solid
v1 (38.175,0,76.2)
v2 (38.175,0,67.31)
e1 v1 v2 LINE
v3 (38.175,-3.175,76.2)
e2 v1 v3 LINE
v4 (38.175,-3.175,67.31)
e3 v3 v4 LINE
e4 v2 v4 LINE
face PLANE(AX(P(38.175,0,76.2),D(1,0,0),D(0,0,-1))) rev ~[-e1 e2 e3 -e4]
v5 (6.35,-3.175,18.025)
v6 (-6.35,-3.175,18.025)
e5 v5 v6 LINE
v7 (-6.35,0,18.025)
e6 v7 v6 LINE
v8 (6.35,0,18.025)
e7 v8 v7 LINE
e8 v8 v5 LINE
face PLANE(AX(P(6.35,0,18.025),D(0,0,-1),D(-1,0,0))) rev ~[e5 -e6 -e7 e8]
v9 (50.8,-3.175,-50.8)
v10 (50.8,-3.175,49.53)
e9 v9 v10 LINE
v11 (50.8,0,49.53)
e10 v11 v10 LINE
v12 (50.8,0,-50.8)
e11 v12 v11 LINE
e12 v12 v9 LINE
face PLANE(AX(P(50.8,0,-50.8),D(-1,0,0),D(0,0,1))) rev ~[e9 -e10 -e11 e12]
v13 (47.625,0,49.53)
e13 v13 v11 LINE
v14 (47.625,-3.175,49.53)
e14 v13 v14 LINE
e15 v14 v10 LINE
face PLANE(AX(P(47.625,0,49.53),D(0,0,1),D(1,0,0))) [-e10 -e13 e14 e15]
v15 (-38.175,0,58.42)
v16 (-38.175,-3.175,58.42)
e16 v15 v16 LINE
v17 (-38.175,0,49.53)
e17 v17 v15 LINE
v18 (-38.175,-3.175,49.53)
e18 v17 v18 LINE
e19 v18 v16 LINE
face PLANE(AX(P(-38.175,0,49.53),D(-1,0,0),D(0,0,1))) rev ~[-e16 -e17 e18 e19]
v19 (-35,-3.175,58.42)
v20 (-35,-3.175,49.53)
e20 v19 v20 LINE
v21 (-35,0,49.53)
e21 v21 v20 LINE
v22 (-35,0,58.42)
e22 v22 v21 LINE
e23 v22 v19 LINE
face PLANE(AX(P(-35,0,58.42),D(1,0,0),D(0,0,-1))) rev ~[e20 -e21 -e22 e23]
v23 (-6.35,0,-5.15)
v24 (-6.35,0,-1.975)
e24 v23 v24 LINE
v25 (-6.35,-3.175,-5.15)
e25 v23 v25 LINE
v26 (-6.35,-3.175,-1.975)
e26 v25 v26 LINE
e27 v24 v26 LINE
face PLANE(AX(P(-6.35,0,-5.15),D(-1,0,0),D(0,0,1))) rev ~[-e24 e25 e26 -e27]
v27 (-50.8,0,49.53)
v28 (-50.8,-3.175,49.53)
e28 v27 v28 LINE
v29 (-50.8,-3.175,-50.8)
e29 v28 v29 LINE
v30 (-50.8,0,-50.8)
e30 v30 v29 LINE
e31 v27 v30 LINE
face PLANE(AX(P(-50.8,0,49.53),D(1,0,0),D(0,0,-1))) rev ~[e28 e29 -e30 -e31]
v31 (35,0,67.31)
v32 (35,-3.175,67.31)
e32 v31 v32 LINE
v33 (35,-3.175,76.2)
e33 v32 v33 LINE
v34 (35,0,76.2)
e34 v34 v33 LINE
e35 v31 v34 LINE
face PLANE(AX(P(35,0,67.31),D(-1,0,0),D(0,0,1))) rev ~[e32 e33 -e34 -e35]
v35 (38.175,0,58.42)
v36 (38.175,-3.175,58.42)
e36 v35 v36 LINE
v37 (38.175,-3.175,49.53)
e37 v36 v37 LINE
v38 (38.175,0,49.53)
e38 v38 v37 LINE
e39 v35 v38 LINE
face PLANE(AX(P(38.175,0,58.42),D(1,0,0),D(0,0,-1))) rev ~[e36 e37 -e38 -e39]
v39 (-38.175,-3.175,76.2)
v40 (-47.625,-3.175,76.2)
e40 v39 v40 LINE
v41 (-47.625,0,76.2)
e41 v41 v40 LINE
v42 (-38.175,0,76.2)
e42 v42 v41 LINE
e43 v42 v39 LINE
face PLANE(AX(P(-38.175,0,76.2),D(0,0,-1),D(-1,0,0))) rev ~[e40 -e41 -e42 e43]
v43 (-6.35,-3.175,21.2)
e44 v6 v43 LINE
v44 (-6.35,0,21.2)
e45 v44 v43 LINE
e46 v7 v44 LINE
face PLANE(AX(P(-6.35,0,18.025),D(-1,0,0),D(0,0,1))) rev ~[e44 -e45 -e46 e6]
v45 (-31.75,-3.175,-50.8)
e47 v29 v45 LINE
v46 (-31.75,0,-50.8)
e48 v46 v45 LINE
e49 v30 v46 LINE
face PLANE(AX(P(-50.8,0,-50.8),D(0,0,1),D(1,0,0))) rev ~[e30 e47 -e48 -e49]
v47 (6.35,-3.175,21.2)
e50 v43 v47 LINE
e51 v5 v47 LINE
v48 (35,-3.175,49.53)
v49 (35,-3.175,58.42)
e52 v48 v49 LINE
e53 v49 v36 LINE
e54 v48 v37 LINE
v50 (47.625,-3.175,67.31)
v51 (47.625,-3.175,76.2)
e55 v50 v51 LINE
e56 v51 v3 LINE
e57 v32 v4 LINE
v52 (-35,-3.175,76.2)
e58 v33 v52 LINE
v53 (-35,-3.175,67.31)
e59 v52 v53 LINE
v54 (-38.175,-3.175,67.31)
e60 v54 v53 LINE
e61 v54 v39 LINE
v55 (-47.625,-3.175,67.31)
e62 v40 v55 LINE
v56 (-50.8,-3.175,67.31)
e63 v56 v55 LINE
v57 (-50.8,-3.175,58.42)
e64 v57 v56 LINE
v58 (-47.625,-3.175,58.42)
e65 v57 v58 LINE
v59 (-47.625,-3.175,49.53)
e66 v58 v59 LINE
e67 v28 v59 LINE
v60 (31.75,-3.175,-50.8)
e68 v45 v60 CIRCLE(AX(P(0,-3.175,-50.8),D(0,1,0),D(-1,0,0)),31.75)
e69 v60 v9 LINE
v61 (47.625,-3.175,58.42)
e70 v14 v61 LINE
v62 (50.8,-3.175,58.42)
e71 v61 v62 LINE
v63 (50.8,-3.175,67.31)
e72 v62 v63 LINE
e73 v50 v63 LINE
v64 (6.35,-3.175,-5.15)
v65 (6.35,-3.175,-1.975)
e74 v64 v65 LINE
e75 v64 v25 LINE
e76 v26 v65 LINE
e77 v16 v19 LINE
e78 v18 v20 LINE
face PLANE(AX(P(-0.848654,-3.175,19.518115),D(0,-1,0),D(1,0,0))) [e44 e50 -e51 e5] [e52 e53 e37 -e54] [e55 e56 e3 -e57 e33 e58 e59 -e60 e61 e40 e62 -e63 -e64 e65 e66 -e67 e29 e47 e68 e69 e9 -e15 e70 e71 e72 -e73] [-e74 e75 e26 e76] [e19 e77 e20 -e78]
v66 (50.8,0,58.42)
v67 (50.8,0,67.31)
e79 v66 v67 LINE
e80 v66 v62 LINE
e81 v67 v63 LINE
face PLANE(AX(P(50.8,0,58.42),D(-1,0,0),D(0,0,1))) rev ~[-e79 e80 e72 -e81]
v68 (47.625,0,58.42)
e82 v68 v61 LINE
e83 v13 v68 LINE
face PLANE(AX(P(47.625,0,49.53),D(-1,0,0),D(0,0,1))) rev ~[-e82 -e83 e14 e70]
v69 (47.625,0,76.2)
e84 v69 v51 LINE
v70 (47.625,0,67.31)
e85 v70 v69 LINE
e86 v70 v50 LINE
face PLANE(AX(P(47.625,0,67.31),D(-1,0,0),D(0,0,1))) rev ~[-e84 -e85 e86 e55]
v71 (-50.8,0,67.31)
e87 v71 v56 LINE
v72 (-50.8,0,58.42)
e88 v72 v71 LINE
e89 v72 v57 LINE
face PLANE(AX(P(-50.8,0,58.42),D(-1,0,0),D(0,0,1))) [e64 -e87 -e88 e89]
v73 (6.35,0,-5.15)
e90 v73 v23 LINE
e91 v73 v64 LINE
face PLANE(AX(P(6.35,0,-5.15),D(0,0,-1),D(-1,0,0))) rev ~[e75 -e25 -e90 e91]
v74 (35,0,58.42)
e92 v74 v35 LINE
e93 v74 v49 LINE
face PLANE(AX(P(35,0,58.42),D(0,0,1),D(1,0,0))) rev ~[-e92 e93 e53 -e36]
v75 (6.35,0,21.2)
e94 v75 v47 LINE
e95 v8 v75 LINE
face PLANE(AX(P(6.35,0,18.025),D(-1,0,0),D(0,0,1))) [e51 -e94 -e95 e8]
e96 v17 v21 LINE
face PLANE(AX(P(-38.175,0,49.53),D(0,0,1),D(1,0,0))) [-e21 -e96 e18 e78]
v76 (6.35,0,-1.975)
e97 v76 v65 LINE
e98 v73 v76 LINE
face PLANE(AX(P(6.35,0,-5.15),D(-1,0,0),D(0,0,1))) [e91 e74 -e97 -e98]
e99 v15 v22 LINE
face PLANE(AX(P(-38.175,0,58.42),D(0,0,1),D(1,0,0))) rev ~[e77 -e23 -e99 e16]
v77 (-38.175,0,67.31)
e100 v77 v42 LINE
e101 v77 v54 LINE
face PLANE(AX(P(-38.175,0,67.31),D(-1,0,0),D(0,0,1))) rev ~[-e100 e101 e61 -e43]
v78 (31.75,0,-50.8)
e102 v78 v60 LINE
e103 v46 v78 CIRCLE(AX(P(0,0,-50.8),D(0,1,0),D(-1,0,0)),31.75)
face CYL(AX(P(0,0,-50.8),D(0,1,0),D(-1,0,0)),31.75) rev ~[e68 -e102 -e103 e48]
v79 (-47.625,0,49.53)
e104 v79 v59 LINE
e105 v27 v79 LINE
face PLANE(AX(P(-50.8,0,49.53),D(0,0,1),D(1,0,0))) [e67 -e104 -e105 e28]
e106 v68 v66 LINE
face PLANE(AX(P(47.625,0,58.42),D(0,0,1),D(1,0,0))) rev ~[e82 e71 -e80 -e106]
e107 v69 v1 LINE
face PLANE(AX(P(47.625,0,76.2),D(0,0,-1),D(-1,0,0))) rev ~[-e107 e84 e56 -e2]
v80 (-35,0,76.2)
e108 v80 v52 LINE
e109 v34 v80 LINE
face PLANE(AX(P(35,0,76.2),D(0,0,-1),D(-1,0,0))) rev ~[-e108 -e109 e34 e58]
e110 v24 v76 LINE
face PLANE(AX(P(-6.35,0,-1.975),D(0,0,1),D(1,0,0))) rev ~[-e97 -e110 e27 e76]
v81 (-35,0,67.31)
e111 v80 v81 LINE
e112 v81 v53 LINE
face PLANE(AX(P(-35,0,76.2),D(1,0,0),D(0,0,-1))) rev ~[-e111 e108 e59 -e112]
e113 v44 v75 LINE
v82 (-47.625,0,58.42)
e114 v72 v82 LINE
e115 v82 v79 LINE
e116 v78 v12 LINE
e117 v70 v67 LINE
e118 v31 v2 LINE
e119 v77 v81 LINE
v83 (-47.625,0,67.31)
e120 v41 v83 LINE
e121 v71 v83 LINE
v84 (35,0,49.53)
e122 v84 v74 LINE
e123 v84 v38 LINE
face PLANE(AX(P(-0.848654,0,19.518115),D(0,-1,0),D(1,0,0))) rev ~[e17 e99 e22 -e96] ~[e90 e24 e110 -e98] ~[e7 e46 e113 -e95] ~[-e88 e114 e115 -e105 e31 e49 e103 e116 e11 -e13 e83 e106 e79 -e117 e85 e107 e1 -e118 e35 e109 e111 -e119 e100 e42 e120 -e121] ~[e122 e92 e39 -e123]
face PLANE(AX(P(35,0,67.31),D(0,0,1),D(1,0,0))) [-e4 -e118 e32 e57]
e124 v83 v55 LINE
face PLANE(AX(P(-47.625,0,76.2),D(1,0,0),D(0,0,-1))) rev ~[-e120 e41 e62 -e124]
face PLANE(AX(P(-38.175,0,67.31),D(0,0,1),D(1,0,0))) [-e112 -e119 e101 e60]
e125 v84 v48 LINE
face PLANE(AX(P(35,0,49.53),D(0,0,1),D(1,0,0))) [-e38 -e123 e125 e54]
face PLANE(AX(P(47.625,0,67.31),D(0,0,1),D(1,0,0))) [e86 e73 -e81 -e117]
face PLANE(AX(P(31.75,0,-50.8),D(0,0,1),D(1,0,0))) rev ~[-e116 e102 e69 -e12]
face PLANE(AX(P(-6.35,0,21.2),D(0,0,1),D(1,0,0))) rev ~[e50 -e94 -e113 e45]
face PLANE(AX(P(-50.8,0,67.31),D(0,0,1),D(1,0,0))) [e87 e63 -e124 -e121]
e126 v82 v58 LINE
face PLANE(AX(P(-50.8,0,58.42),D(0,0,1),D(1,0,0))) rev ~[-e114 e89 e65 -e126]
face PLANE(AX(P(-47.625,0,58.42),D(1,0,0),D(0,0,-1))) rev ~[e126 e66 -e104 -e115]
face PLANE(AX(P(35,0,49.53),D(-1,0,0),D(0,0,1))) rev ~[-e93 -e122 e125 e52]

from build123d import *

# Parameters (mm, degrees)
F0_W     = 3.175
F0_H     = 8.89
F0_H_2   = 12.7
F0_H_3   = 49.53
F0_H_4   = 27.94
F0_W_2   = 8.89
F0_H_5   = 11.43
F0_W_3   = 12.7
F0_H_6   = 3.175
F1_DEPTH = 3.175


with BuildPart() as f1:
    # F0 (on Front) → F1 (new body)
    with BuildSketch(Plane.XZ):
        with BuildLine():
            Line((-38.175, 76.2), (-47.625, 76.2))
            Line((-47.625, 76.2), (-47.625, 67.31))
            Line((-47.625, 67.31), (-47.625, 58.42))
            Line((-47.625, 58.42), (-47.625, 49.53))
            Line((-47.625, 49.53), (-47.625, 40.64))
            Line((-47.625, 40.64), (-47.625, 27.94))
            Line((-47.625, 27.94), (-47.625, 0))
            Line((-47.625, 0), (-50.8, 0))
            Line((-50.8, 0), (-50.8, -50.8))
            Line((-50.8, -50.8), (-43.18, -50.8))
            Line((-43.18, -50.8), (-43.18, -41.91))
            Line((-43.18, -41.91), (-34.29, -41.91))
            Line((-34.29, -41.91), (-34.29, -50.8))
            Line((-34.29, -50.8), (-31.75, -50.8))
            ThreePointArc((-31.75, -50.8), (0, -19.05), (31.75, -50.8))
            Line((31.75, -50.8), (50.8, -50.8))
            Line((50.8, -50.8), (50.8, 0))
            Line((50.8, 0), (47.625, 0))
            Line((47.625, 0), (47.625, 12.7))
            Line((47.625, 12.7), (47.625, 25.4))
            Line((47.625, 25.4), (47.625, 38.1))
            Line((47.625, 38.1), (47.625, 49.53))
            Line((47.625, 49.53), (47.625, 58.42))
            Line((47.625, 58.42), (47.625, 67.31))
            Line((47.625, 67.31), (47.625, 76.2))
            Line((47.625, 76.2), (38.175, 76.2))
            Line((38.175, 76.2), (38.175, 67.31))
            Line((38.175, 67.31), (38.175, 58.42))
            Line((38.175, 58.42), (38.175, 49.53))
            Line((38.175, 49.53), (38.175, 40.64))
            Line((38.175, 40.64), (38.175, 27.94))
            Line((38.175, 27.94), (38.175, 0))
            Line((38.175, 0), (35, 0))
            Line((35, 0), (35, 27.94))
            Line((35, 27.94), (35, 40.64))
            Line((35, 40.64), (35, 49.53))
            Line((35, 49.53), (35, 58.42))
            Line((35, 58.42), (35, 67.31))
            Line((35, 67.31), (35, 76.2))
            Line((35, 76.2), (-35, 76.2))
            Line((-35, 76.2), (-35, 67.31))
            Line((-35, 67.31), (-35, 58.42))
            Line((-35, 58.42), (-35, 49.53))
            Line((-35, 49.53), (-35, 0))
            Line((-35, 0), (-38.175, 0))
            Line((-38.175, 0), (-38.175, 49.53))
            Line((-38.175, 49.53), (-38.175, 58.42))
            Line((-38.175, 58.42), (-38.175, 67.31))
            Line((-38.175, 67.31), (-38.175, 76.2))
        make_face()
        Polygon((19.05, -1.975), (31.75, -1.975), (31.75, -5.15), (19.05, -5.15), (6.35, -5.15), (-6.35, -5.15), (-19.05, -5.15), (-31.75, -5.15), (-31.75, -1.975), (-19.05, -1.975), (-6.35, -1.975), (6.35, -1.975), align=None, mode=Mode.SUBTRACT)
        Polygon((19.05, 21.2), (31.75, 21.2), (31.75, 18.025), (19.05, 18.025), (6.35, 18.025), (-6.35, 18.025), (-19.05, 18.025), (-31.75, 18.025), (-31.75, 21.2), (-19.05, 21.2), (-6.35, 21.2), (6.35, 21.2), align=None, mode=Mode.SUBTRACT)
        with Locations((-49.2125, 62.865)):
            Rectangle(F0_W, F0_H)
        with Locations((-36.5875, 62.865)):
            Rectangle(F0_W, F0_H)
        with Locations((-49.2125, 45.085)):
            Rectangle(F0_W, F0_H)
        with Locations((-49.2125, 34.29)):
            Rectangle(F0_W, F0_H_2)
        with Locations((36.5875, 62.865)):
            Rectangle(F0_W, F0_H)
        with Locations((-36.5875, 24.765)):
            Rectangle(F0_W, F0_H_3)
        with Locations((-49.2125, 13.97)):
            Rectangle(F0_W, F0_H_4)
        with Locations((49.2125, 62.865)):
            Rectangle(F0_W, F0_H)
        with Locations((36.5875, 45.085)):
            Rectangle(F0_W, F0_H)
        with Locations((36.5875, 34.29)):
            Rectangle(F0_W, F0_H_2)
        with Locations((-38.735, -46.355)):
            Rectangle(F0_W_2, F0_H)
        with Locations((49.2125, 43.815)):
            Rectangle(F0_W, F0_H_5)
        with Locations((36.5875, 13.97)):
            Rectangle(F0_W, F0_H_4)
        with Locations((49.2125, 31.75)):
            Rectangle(F0_W, F0_H_2)
        with Locations((49.2125, 19.05)):
            Rectangle(F0_W, F0_H_2)
        with Locations((49.2125, 6.35)):
            Rectangle(F0_W, F0_H_2)
        with Locations((25.4, 19.6125)):
            Rectangle(F0_W_3, F0_H_6)
        with Locations((12.7, 19.6125)):
            Rectangle(F0_W_3, F0_H_6)
        with Locations((-12.7, 19.6125)):
            Rectangle(F0_W_3, F0_H_6)
        with Locations((-25.4, 19.6125)):
            Rectangle(F0_W_3, F0_H_6)
        with Locations((25.4, -3.5625)):
            Rectangle(F0_W_3, F0_H_6)
        with Locations((12.7, -3.5625)):
            Rectangle(F0_W_3, F0_H_6)
        with Locations((-12.7, -3.5625)):
            Rectangle(F0_W_3, F0_H_6)
        with Locations((-25.4, -3.5625)):
            Rectangle(F0_W_3, F0_H_6)
    extrude(amount=F1_DEPTH)


solid = f1.part
